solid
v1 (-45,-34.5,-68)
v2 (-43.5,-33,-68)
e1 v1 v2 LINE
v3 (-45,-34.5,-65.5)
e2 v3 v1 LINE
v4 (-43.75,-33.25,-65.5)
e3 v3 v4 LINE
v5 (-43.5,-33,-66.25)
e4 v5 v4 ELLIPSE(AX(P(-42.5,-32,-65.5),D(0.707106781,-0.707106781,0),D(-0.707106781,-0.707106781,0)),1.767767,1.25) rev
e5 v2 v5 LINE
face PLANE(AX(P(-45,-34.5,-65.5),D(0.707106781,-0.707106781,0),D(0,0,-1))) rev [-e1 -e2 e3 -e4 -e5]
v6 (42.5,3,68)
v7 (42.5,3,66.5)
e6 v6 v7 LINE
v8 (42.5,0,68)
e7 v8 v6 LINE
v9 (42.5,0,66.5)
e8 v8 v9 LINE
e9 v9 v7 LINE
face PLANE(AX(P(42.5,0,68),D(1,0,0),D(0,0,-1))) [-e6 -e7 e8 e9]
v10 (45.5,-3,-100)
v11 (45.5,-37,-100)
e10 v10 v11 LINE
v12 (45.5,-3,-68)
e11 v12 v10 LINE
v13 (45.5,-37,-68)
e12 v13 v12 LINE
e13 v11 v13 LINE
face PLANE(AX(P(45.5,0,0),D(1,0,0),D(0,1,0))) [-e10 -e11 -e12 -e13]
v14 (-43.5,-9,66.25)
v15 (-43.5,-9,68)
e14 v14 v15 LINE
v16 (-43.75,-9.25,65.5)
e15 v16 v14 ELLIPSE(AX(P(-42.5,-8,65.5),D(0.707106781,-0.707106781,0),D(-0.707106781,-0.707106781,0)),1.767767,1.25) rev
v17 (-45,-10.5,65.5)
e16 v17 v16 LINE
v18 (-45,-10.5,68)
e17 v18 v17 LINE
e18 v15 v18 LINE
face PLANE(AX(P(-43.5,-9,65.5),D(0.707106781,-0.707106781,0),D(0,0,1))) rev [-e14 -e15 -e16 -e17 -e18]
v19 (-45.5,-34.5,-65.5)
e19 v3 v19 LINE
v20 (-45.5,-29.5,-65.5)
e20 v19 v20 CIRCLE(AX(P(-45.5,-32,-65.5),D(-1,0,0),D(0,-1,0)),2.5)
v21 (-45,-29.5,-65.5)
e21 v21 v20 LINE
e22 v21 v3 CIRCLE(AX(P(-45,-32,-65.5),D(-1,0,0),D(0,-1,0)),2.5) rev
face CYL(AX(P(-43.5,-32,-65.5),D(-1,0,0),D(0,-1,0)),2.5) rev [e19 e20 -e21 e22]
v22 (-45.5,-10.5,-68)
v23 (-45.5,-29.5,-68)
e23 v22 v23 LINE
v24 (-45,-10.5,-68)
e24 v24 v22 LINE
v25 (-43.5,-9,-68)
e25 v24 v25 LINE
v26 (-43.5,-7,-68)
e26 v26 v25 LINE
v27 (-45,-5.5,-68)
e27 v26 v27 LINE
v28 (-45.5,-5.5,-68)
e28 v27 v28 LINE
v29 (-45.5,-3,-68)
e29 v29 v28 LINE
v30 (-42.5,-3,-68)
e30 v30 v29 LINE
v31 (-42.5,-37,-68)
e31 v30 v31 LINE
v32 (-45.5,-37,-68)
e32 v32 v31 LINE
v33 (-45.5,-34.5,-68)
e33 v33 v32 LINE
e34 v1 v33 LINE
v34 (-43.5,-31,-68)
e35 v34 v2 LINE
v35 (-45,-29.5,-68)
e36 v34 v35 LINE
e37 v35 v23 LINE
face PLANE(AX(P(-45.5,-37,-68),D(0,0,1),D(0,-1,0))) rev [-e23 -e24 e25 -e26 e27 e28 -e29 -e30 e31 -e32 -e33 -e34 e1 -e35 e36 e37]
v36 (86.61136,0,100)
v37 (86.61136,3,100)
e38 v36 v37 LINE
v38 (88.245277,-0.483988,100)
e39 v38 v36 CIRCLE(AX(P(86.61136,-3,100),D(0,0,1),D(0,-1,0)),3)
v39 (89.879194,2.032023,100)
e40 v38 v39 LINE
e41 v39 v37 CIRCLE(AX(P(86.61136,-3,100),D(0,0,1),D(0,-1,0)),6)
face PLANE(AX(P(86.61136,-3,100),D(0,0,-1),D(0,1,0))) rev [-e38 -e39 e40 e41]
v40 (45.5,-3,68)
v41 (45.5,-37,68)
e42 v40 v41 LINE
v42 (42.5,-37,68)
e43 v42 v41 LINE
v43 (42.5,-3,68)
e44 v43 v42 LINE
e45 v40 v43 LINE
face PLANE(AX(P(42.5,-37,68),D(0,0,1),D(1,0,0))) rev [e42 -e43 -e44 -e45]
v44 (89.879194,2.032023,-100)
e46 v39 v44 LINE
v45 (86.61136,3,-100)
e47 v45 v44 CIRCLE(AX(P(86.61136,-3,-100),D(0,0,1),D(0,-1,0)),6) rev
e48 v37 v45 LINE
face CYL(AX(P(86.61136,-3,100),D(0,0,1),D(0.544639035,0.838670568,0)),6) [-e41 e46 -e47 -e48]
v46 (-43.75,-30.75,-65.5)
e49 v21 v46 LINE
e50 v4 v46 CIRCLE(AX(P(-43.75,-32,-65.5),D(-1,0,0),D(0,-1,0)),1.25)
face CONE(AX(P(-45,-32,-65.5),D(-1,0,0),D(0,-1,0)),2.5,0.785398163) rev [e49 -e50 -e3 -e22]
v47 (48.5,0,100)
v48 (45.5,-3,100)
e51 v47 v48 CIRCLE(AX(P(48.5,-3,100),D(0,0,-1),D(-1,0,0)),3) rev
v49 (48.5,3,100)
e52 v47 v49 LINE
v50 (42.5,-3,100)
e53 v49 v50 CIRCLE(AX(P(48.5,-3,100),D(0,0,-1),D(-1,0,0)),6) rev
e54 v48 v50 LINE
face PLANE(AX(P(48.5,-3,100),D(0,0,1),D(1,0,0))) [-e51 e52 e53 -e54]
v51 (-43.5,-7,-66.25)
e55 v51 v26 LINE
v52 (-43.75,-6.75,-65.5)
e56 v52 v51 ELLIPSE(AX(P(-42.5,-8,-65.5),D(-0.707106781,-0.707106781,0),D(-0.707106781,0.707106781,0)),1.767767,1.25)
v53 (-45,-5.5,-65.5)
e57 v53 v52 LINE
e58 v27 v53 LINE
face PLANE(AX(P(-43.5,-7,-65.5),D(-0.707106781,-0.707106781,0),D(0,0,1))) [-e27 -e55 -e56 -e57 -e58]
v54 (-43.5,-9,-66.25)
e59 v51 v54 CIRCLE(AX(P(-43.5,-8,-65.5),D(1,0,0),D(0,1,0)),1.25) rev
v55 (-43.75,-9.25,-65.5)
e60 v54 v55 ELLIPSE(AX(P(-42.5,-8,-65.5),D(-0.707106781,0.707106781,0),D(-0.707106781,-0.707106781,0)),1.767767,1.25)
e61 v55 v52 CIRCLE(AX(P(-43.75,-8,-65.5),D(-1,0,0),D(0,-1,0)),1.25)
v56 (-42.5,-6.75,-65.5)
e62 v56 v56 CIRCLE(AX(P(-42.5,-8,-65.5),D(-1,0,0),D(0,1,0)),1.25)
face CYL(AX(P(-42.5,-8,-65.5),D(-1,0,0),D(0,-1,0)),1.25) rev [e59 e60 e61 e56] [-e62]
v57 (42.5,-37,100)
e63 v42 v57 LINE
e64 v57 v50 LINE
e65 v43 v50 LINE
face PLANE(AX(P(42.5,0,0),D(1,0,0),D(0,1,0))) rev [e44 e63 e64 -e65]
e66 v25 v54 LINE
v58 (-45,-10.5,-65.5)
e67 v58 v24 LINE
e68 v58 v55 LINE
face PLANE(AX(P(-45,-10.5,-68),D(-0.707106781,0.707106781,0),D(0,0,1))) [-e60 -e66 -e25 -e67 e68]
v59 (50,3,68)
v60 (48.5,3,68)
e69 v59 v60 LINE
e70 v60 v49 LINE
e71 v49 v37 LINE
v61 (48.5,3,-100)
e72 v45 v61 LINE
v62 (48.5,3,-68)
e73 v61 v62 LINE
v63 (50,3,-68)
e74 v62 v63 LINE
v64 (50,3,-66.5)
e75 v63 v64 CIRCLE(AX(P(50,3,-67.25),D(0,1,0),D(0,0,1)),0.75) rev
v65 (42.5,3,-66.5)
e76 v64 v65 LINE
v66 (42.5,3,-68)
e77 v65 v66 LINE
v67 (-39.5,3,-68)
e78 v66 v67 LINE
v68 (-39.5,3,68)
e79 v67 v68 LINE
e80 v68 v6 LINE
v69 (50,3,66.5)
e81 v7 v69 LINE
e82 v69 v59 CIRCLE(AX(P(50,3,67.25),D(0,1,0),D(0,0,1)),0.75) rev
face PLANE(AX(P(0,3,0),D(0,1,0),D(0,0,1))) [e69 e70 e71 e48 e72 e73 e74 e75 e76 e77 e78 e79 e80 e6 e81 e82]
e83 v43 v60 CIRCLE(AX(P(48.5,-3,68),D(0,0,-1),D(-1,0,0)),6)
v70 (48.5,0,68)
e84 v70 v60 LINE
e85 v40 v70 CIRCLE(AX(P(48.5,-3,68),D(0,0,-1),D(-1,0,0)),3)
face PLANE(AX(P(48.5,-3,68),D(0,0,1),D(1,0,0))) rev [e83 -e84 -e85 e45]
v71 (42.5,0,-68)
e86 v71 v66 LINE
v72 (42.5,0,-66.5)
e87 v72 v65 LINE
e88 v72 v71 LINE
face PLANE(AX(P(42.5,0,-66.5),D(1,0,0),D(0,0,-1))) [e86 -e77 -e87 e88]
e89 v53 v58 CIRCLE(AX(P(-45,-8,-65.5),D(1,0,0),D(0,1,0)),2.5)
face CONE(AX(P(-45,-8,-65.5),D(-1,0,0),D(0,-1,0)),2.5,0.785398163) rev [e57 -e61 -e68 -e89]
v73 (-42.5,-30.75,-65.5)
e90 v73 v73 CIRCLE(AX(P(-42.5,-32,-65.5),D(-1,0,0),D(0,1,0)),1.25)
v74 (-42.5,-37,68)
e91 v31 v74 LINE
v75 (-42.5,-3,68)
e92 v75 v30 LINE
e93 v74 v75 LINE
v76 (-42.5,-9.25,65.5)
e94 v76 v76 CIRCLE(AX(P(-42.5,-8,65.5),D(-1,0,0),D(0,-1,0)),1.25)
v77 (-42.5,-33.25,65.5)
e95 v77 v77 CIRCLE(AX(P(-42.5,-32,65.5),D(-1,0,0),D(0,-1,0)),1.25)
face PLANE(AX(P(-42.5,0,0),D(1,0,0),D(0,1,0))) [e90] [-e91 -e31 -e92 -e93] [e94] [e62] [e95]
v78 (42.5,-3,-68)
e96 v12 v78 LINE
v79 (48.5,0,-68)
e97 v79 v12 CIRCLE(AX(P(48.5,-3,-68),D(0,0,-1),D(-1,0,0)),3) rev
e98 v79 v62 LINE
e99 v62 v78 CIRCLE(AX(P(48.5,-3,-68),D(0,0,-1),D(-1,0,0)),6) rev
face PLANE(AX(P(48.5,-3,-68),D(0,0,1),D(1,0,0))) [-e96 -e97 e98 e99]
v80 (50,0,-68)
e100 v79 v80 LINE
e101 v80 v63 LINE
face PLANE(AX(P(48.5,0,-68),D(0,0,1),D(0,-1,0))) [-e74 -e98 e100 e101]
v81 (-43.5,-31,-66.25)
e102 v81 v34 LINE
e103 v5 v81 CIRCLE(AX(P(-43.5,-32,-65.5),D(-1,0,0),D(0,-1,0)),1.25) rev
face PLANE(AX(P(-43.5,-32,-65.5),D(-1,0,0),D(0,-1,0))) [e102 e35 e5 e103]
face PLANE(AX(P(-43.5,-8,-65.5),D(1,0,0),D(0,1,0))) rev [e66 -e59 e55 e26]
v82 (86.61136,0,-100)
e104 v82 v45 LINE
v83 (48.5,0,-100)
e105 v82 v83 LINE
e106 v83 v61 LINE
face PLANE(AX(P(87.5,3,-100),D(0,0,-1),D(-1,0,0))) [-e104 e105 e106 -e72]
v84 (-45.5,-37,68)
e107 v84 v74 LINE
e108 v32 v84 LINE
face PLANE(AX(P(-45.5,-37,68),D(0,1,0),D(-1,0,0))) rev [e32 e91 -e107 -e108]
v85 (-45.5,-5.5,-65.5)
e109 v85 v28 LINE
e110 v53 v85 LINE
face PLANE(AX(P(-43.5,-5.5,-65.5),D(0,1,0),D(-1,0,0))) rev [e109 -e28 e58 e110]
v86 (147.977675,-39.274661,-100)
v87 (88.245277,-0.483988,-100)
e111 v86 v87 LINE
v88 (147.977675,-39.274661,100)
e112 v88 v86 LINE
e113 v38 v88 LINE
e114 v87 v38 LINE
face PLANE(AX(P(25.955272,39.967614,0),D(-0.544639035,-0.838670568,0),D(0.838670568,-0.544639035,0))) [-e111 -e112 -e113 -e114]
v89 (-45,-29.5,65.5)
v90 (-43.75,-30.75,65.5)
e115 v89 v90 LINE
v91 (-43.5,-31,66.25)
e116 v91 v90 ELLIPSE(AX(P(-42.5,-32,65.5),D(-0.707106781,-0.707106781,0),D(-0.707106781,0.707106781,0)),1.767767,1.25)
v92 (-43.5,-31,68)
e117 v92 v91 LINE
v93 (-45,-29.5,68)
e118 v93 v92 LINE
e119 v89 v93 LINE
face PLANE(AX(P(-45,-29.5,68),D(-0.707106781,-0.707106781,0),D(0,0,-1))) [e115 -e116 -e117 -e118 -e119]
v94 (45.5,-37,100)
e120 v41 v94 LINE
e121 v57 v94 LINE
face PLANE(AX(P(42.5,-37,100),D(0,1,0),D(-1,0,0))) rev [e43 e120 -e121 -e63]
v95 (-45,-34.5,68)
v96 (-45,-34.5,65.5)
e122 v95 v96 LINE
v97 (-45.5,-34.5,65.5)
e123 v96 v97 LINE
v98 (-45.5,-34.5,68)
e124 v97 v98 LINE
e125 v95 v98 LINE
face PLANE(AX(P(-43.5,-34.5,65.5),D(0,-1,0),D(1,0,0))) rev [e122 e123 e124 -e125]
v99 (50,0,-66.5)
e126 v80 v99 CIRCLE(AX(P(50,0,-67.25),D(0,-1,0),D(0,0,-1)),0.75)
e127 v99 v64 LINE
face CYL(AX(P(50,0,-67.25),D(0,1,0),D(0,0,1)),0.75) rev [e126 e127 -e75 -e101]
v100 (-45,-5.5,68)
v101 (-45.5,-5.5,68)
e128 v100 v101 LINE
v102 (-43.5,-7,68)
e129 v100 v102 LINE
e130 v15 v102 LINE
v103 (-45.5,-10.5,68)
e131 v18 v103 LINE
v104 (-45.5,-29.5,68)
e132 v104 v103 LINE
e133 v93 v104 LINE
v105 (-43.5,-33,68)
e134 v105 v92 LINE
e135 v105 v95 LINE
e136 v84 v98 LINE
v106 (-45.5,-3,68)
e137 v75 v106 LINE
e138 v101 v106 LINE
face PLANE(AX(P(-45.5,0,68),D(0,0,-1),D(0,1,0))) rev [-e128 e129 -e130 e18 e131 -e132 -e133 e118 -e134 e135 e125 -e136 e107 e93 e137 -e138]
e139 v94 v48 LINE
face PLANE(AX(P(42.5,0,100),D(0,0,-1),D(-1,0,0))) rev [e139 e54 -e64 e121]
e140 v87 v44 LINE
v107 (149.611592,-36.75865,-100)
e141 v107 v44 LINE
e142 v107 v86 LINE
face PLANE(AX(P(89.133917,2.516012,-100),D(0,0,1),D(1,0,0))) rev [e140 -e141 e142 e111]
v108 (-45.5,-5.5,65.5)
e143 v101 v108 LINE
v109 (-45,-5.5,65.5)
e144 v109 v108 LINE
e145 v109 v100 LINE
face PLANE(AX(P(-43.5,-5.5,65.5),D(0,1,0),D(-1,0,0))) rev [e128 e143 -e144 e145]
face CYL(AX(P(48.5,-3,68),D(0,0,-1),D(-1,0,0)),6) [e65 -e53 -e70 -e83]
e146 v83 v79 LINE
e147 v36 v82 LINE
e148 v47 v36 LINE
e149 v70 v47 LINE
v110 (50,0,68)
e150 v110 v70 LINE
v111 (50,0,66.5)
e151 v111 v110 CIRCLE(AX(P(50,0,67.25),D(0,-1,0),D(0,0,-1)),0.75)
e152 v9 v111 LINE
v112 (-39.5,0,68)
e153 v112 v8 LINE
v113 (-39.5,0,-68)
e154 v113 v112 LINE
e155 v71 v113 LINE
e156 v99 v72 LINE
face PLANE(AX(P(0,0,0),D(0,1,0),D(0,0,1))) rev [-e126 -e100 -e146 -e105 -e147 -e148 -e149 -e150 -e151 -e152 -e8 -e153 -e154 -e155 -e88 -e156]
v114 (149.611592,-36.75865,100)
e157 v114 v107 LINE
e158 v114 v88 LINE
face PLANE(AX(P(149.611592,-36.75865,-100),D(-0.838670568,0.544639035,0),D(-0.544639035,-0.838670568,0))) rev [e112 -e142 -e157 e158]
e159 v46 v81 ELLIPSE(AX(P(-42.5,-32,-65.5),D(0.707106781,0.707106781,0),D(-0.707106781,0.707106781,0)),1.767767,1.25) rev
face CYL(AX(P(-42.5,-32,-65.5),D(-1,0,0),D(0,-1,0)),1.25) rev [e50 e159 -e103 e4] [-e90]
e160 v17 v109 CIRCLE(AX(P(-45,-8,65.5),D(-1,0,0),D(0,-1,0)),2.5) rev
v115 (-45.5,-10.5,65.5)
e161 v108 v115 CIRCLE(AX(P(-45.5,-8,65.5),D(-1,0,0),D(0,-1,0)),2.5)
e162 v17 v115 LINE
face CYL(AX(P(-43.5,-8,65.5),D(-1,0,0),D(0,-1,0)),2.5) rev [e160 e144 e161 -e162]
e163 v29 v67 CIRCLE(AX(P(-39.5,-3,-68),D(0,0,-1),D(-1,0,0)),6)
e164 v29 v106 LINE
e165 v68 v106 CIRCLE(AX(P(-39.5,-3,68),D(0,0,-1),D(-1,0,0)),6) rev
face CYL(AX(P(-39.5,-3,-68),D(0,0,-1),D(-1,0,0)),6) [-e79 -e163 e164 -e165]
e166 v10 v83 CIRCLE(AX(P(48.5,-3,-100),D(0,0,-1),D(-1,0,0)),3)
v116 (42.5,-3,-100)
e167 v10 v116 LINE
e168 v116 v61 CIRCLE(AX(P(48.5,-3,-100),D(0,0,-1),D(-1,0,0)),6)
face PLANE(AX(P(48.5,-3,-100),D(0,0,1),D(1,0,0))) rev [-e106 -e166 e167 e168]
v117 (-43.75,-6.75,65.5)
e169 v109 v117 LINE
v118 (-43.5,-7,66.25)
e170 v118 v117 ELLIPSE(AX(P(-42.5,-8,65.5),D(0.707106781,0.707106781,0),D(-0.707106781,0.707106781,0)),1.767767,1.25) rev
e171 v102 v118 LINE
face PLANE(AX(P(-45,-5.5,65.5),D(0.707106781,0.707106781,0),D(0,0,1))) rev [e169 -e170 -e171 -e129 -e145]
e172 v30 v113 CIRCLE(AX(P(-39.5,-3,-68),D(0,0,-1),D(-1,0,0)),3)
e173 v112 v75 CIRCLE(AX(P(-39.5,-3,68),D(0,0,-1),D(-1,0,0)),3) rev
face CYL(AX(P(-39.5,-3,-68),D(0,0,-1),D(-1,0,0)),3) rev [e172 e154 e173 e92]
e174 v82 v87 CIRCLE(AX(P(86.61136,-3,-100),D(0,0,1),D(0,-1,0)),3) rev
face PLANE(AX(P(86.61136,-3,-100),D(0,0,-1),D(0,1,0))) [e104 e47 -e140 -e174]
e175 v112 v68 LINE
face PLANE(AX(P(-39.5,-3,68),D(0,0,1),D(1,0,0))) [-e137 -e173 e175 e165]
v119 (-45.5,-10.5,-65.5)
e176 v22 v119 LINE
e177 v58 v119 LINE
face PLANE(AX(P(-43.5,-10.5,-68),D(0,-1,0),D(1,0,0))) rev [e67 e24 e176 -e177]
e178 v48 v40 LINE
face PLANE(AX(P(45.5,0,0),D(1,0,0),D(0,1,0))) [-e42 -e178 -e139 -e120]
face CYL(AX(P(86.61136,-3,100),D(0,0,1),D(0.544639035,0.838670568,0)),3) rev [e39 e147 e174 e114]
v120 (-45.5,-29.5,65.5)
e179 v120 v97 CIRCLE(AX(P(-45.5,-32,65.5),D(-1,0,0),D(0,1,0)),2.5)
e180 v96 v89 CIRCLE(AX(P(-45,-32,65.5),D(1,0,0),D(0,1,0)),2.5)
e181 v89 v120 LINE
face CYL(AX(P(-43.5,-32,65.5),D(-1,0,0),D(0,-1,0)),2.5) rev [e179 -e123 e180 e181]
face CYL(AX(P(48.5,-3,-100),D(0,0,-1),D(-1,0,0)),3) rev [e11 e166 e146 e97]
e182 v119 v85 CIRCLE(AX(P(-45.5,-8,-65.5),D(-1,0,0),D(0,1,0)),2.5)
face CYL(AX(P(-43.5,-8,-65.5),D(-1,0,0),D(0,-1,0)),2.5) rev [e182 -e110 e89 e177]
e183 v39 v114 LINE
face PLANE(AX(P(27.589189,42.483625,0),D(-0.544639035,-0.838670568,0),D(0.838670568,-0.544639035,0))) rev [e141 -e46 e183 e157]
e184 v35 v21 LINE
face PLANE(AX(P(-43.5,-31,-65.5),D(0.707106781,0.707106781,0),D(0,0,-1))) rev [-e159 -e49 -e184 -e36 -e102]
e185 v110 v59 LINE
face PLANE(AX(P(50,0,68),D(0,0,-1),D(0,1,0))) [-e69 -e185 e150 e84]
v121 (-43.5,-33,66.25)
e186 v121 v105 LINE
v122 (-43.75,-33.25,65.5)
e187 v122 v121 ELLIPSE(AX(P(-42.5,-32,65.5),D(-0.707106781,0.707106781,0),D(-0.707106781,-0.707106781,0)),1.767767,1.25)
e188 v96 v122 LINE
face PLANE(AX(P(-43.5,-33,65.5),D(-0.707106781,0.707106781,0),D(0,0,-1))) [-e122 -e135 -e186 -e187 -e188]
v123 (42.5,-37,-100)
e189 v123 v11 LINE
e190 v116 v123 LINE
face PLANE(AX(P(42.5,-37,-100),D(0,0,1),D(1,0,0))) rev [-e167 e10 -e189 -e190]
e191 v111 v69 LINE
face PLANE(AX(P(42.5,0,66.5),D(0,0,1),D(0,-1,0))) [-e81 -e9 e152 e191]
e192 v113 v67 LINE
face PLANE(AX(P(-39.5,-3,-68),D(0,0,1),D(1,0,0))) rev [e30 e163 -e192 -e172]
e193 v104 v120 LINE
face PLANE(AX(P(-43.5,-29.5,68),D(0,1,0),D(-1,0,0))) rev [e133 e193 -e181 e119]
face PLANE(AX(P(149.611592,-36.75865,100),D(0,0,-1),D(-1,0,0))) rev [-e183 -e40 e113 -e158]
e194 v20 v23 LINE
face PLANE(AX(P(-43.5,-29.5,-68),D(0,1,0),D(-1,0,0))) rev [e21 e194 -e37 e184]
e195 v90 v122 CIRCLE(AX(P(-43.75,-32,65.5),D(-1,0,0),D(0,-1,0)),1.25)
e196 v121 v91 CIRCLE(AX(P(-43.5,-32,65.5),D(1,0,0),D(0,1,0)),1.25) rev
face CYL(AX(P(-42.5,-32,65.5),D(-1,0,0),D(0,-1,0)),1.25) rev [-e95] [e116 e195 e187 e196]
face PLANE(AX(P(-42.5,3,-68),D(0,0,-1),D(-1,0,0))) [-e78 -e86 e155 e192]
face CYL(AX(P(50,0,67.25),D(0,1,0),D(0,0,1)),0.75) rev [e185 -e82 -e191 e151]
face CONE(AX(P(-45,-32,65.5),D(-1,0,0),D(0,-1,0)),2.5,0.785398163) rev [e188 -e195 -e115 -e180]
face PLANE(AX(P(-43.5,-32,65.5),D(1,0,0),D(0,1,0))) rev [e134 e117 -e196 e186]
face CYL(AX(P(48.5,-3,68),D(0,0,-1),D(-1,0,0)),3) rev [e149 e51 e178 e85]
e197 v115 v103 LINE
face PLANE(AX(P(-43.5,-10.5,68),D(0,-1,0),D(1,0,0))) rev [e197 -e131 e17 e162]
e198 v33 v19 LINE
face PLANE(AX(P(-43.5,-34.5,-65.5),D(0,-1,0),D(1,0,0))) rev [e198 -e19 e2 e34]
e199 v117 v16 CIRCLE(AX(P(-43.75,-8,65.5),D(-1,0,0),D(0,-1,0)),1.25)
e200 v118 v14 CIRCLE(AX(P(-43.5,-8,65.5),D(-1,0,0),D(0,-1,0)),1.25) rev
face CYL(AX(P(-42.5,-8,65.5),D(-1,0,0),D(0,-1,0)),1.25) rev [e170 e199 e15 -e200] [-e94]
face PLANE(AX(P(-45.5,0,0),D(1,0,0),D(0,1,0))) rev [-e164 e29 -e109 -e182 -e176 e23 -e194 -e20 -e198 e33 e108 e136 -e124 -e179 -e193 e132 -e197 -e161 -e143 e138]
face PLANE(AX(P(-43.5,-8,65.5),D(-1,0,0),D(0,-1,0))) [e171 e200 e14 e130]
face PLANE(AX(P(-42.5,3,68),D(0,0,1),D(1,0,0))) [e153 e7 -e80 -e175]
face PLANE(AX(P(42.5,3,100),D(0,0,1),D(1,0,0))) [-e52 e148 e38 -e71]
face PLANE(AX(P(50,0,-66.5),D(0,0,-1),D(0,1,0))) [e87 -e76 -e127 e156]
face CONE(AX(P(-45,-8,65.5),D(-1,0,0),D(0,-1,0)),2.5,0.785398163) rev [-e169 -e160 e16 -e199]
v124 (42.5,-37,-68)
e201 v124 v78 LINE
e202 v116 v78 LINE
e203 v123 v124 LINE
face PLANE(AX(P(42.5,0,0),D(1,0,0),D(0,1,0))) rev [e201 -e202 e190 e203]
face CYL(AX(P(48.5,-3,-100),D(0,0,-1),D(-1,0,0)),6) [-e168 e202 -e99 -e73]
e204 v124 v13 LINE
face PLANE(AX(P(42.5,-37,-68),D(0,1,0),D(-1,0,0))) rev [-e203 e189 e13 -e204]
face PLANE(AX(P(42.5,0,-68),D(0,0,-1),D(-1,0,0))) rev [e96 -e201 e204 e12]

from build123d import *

# Parameters (mm, degrees)
SALIENTE_EXTRUIR1_DEPTH          = 3
BRIDA_DE_ARISTA1_STRIP_W         = 18
BRIDA_DE_ARISTA1_STRIP_H         = 3
BRIDA_DE_ARISTA1_STRIP_CUT_DEPTH = 136
BRIDA_DE_ARISTA1_DEPTH           = 136
CROQUIS5_R                       = 1.25
CORTAR_EXTRUIR1_DEPTH            = 3
CORTAR_EXTRUIR2_DEPTH            = 2
CHAFL_N1_SIZE                    = 1.5
BRIDA_START                      = -100
BRIDA_DE_ARISTA2_DEPTH           = 33.5
BRIDA_START_2                    = 66.5
BRIDA_DE_ARISTA2_2_DEPTH         = 33.5
BRIDA_DE_ARISTA2_3_DEPTH         = 32
BRIDA_START_3                    = 68
BRIDA_DE_ARISTA2_4_DEPTH         = 32
BRIDA_START_4                    = -3
BRIDA_DE_ARISTA2_5_DEPTH         = 7
BRIDA_DE_ARISTA3_STRIP_CUT_DEPTH = 200
BRIDA_DE_ARISTA3_DEPTH           = 200


with BuildPart() as part:
    # Croquis1 → Saliente-Extruir1 (new body)
    with BuildSketch(Plane(origin=(0, 0, 0), x_dir=(1, 0, 0), z_dir=(0, 1, 0))):
        Polygon((-42.5, -68), (42.5, -68), (42.5, -100), (87.5, -100), (87.5, 100), (42.5, 100), (42.5, 68), (-42.5, 68), align=None)
    extrude(amount=SALIENTE_EXTRUIR1_DEPTH)

    # Brida de arista1: sheet metal written as solids
    # Brida de arista1 strip (on a plane across the edge) → Brida de arista1 strip cut (cut)
    with BuildSketch(Plane(origin=(-42.5, 0, 68), x_dir=(1, 0, 0), z_dir=(0, 0, -1))):
        with Locations((-6, -1.5)):
            Rectangle(BRIDA_DE_ARISTA1_STRIP_W, BRIDA_DE_ARISTA1_STRIP_H)
    extrude(amount=BRIDA_DE_ARISTA1_STRIP_CUT_DEPTH, mode=Mode.SUBTRACT)

    # Brida de arista1 section (on a plane across the edge) → Brida de arista1 (add)
    with BuildSketch(Plane(origin=(-42.5, 0, 68), x_dir=(1, 0, 0), z_dir=(0, 0, -1))):
        with BuildLine():
            Line((-3, 3), (-3, 37))
            Line((-3, 37), (0, 37))
            Line((0, 37), (0, 3))
            ThreePointArc((0, 3), (0.878679656, 0.878679656), (3, 0))
            Line((3, 0), (3, -3))
            ThreePointArc((3, -3), (-1.242640687, -1.242640687), (-3, 3))
        make_face()
    extrude(amount=BRIDA_DE_ARISTA1_DEPTH)

    # Croquis5 → Cortar-Extruir1 (cut)
    with BuildSketch(Plane.ZY.offset(45.5)):
        with Locations(Location((65.5, -32, 0), (0, 0, 270))):
            Circle(CROQUIS5_R)
        with Locations(Location((65.5, -8, 0), (0, 0, 270))):
            Circle(CROQUIS5_R)
        with Locations(Location((-65.5, -8, 0), (0, 0, 90))):
            Circle(CROQUIS5_R)
        with Locations(Location((-65.5, -32, 0), (0, 0, 90))):
            Circle(CROQUIS5_R)
    extrude(amount=-CORTAR_EXTRUIR1_DEPTH, mode=Mode.SUBTRACT)

    # Croquis6 → Cortar-Extruir2 (cut)
    with BuildSketch(Plane.ZY.offset(45.5)):
        with BuildLine():
            Line((65.5, -5.5), (68, -5.5))
            Line((68, -5.5), (68, -10.5))
            Line((68, -10.5), (65.5, -10.5))
            ThreePointArc((65.5, -10.5), (63, -8), (65.5, -5.5))
        make_face()
        with BuildLine():
            Line((68, -29.5), (65.5, -29.5))
            ThreePointArc((65.5, -29.5), (63, -32), (65.5, -34.5))
            Line((65.5, -34.5), (68, -34.5))
            Line((68, -34.5), (68, -29.5))
        make_face()
        with BuildLine():
            Line((-65.5, -34.5), (-68, -34.5))
            Line((-68, -34.5), (-68, -29.5))
            Line((-68, -29.5), (-65.5, -29.5))
            ThreePointArc((-65.5, -29.5), (-63, -32), (-65.5, -34.5))
        make_face()
        with BuildLine():
            Line((-68, -10.5), (-65.5, -10.5))
            ThreePointArc((-65.5, -10.5), (-63, -8), (-65.5, -5.5))
            Line((-65.5, -5.5), (-68, -5.5))
            Line((-68, -5.5), (-68, -10.5))
        make_face()
    extrude(amount=-CORTAR_EXTRUIR2_DEPTH, mode=Mode.SUBTRACT)

    # Chaflán1
    # the kernel refuses this chamfer: 1.5 mm, written as the material it adds along each edge
    with BuildSketch(Plane(origin=(-43.5, -5.5, 65.5), x_dir=(-1, 0, 0), z_dir=(0, 0, 1))) as chafl_n1_piece_1_section:
        Polygon((CHAFL_N1_SIZE, 0), (0, CHAFL_N1_SIZE), (0, 0), align=None)
    chafl_n1_piece_1 = extrude(amount=2.5, mode=Mode.PRIVATE)
    chafl_n1_piece_1 = chafl_n1_piece_1 - Plane(origin=(-43.5, -8, 65.5), x_dir=(0, -1, 0), z_dir=(-1, 0, 0)) * Cylinder(1.25, 12, mode=Mode.PRIVATE)
    add(chafl_n1_piece_1)
    with BuildSketch(Plane(origin=(-43.5, -10.5, 68), x_dir=(0, 1, 0), z_dir=(0, 0, -1))) as chafl_n1_piece_2_section:
        Polygon((CHAFL_N1_SIZE, 0), (0, -CHAFL_N1_SIZE), (0, 0), align=None)
    chafl_n1_piece_2 = extrude(amount=2.5, mode=Mode.PRIVATE)
    chafl_n1_piece_2 = chafl_n1_piece_2 - Plane(origin=(-43.5, -8, 65.5), x_dir=(0, -1, 0), z_dir=(-1, 0, 0)) * Cylinder(1.25, 12, mode=Mode.PRIVATE)
    add(chafl_n1_piece_2)
    with BuildSketch(Plane(origin=(-43.5, -29.5, 68), x_dir=(-1, 0, 0), z_dir=(0, 0, -1))) as chafl_n1_piece_3_section:
        Polygon((CHAFL_N1_SIZE, 0), (0, -CHAFL_N1_SIZE), (0, 0), align=None)
    chafl_n1_piece_3 = extrude(amount=2.5, mode=Mode.PRIVATE)
    chafl_n1_piece_3 = chafl_n1_piece_3 - Plane(origin=(-43.5, -32, 65.5), x_dir=(0, -1, 0), z_dir=(-1, 0, 0)) * Cylinder(1.25, 12, mode=Mode.PRIVATE)
    add(chafl_n1_piece_3)
    with BuildSketch(Plane(origin=(-43.5, -34.5, 65.5), x_dir=(0, 1, 0), z_dir=(0, 0, 1))) as chafl_n1_piece_4_section:
        Polygon((CHAFL_N1_SIZE, 0), (0, CHAFL_N1_SIZE), (0, 0), align=None)
    chafl_n1_piece_4 = extrude(amount=2.5, mode=Mode.PRIVATE)
    chafl_n1_piece_4 = chafl_n1_piece_4 - Plane(origin=(-43.5, -32, 65.5), x_dir=(0, -1, 0), z_dir=(-1, 0, 0)) * Cylinder(1.25, 12, mode=Mode.PRIVATE)
    add(chafl_n1_piece_4)
    with BuildSketch(Plane(origin=(-43.5, -34.5, -65.5), x_dir=(-1, 0, 0), z_dir=(0, 0, -1))) as chafl_n1_piece_5_section:
        Polygon((CHAFL_N1_SIZE, 0), (0, CHAFL_N1_SIZE), (0, 0), align=None)
    chafl_n1_piece_5 = extrude(amount=2.5, mode=Mode.PRIVATE)
    chafl_n1_piece_5 = chafl_n1_piece_5 - Plane(origin=(-43.5, -32, -65.5), x_dir=(0, 1, 0), z_dir=(-1, 0, 0)) * Cylinder(1.25, 12, mode=Mode.PRIVATE)
    add(chafl_n1_piece_5)
    with BuildSketch(Plane(origin=(-43.5, -29.5, -68), x_dir=(-1, 0, 0), z_dir=(0, 0, 1))) as chafl_n1_piece_6_section:
        Polygon((CHAFL_N1_SIZE, 0), (0, CHAFL_N1_SIZE), (0, 0), align=None)
    chafl_n1_piece_6 = extrude(amount=2.5, mode=Mode.PRIVATE)
    chafl_n1_piece_6 = chafl_n1_piece_6 - Plane(origin=(-43.5, -32, -65.5), x_dir=(0, 1, 0), z_dir=(-1, 0, 0)) * Cylinder(1.25, 12, mode=Mode.PRIVATE)
    add(chafl_n1_piece_6)
    with BuildSketch(Plane(origin=(-43.5, -10.5, -68), x_dir=(-1, 0, 0), z_dir=(0, 0, 1))) as chafl_n1_piece_7_section:
        Polygon((CHAFL_N1_SIZE, 0), (0, -CHAFL_N1_SIZE), (0, 0), align=None)
    chafl_n1_piece_7 = extrude(amount=2.5, mode=Mode.PRIVATE)
    chafl_n1_piece_7 = chafl_n1_piece_7 - Plane(origin=(-43.5, -8, -65.5), x_dir=(0, 1, 0), z_dir=(-1, 0, 0)) * Cylinder(1.25, 12, mode=Mode.PRIVATE)
    add(chafl_n1_piece_7)
    with BuildSketch(Plane(origin=(-43.5, -5.5, -65.5), x_dir=(-1, 0, 0), z_dir=(0, 0, -1))) as chafl_n1_piece_8_section:
        Polygon((CHAFL_N1_SIZE, 0), (0, -CHAFL_N1_SIZE), (0, 0), align=None)
    chafl_n1_piece_8 = extrude(amount=2.5, mode=Mode.PRIVATE)
    chafl_n1_piece_8 = chafl_n1_piece_8 - Plane(origin=(-43.5, -8, -65.5), x_dir=(0, 1, 0), z_dir=(-1, 0, 0)) * Cylinder(1.25, 12, mode=Mode.PRIVATE)
    add(chafl_n1_piece_8)
    with BuildSketch(Plane(origin=(-43.5, -8, -65.5), x_dir=(0, -1, 0), z_dir=(0, 0, -1))) as chafl_n1_piece_9_section:
        Polygon((2.5, CHAFL_N1_SIZE), (2.5 - CHAFL_N1_SIZE, 0), (2.5, 0), align=None)
    chafl_n1_piece_9 = revolve(axis=Axis((-43.5, -8, -65.5), (-1, 0, 0)), revolution_arc=180, mode=Mode.PRIVATE)
    chafl_n1_piece_9 = chafl_n1_piece_9 - Plane(origin=(-43.5, -8, -65.5), x_dir=(0, 1, 0), z_dir=(-1, 0, 0)) * Cylinder(1.25, 11, mode=Mode.PRIVATE)
    add(chafl_n1_piece_9)
    with BuildSketch(Plane(origin=(-43.5, -32, -65.5), x_dir=(0, 1, 0), z_dir=(0, 0, -1))) as chafl_n1_piece_10_section:
        Polygon((2.5, -CHAFL_N1_SIZE), (2.5 - CHAFL_N1_SIZE, 0), (2.5, 0), align=None)
    chafl_n1_piece_10 = revolve(axis=Axis((-43.5, -32, -65.5), (1, 0, 0)), revolution_arc=180, mode=Mode.PRIVATE)
    chafl_n1_piece_10 = chafl_n1_piece_10 - Plane(origin=(-43.5, -32, -65.5), x_dir=(0, 1, 0), z_dir=(-1, 0, 0)) * Cylinder(1.25, 11, mode=Mode.PRIVATE)
    add(chafl_n1_piece_10)
    with BuildSketch(Plane(origin=(-43.5, -32, 65.5), x_dir=(0, 1, 0), z_dir=(0, 0, 1))) as chafl_n1_piece_11_section:
        Polygon((2.5 - CHAFL_N1_SIZE, 0), (2.5, CHAFL_N1_SIZE), (2.5, 0), align=None)
    chafl_n1_piece_11 = revolve(axis=Axis((-43.5, -32, 65.5), (-1, 0, 0)), revolution_arc=180, mode=Mode.PRIVATE)
    chafl_n1_piece_11 = chafl_n1_piece_11 - Plane(origin=(-43.5, -32, 65.5), x_dir=(0, -1, 0), z_dir=(-1, 0, 0)) * Cylinder(1.25, 11, mode=Mode.PRIVATE)
    add(chafl_n1_piece_11)
    with BuildSketch(Plane(origin=(-43.5, -8, 65.5), x_dir=(0, -1, 0), z_dir=(0, 0, 1))) as chafl_n1_piece_12_section:
        Polygon((2.5 - CHAFL_N1_SIZE, 0), (2.5, -CHAFL_N1_SIZE), (2.5, 0), align=None)
    chafl_n1_piece_12 = revolve(axis=Axis((-43.5, -8, 65.5), (1, 0, 0)), revolution_arc=180, mode=Mode.PRIVATE)
    chafl_n1_piece_12 = chafl_n1_piece_12 - Plane(origin=(-43.5, -8, 65.5), x_dir=(0, -1, 0), z_dir=(-1, 0, 0)) * Cylinder(1.25, 11, mode=Mode.PRIVATE)
    add(chafl_n1_piece_12)

    # Brida de arista2: read off the stored shape, not the designer's step
    # Brida de arista2 outline → Brida de arista2 (cut)
    with BuildSketch(Plane.XY.offset(BRIDA_START)):
        with BuildLine():
            Line((42.5, 0), (43.303847577, 0))
            ThreePointArc((43.303847577, 0), (45.5, 2.196152423), (48.5, 3))
            Line((48.5, 3), (42.5, 3))
            Line((42.5, 3), (42.5, 0))
        make_face()
    extrude(amount=BRIDA_DE_ARISTA2_DEPTH, mode=Mode.SUBTRACT)

    # Brida de arista2 2 outline → Brida de arista2 2 (cut)
    with BuildSketch(Plane.XY.offset(BRIDA_START_2)):
        with BuildLine():
            Line((42.5, 0), (43.303847577, 0))
            ThreePointArc((43.303847577, 0), (45.5, 2.196152423), (48.5, 3))
            Line((48.5, 3), (42.5, 3))
            Line((42.5, 3), (42.5, 0))
        make_face()
    extrude(amount=BRIDA_DE_ARISTA2_2_DEPTH, mode=Mode.SUBTRACT)

    # Brida de arista2 3 outline → Brida de arista2 3 (add)
    with BuildSketch(Plane.XY.offset(BRIDA_START)):
        with BuildLine():
            Line((42.5, -37), (45.5, -37))
            Line((45.5, -37), (45.5, -3))
            ThreePointArc((45.5, -3), (46.378679656, -0.878679656), (48.5, 0))
            Line((48.5, 0), (43.303847577, 0))
            ThreePointArc((43.303847577, 0), (42.704445042, -1.447085729), (42.5, -3))
            Line((42.5, -3), (42.5, -37))
        make_face()
    extrude(amount=BRIDA_DE_ARISTA2_3_DEPTH)

    # Brida de arista2 4 outline → Brida de arista2 4 (add)
    with BuildSketch(Plane.XY.offset(BRIDA_START_3)):
        with BuildLine():
            Line((42.5, -37), (45.5, -37))
            Line((45.5, -37), (45.5, -3))
            ThreePointArc((45.5, -3), (46.378679656, -0.878679656), (48.5, 0))
            Line((48.5, 0), (43.303847577, 0))
            ThreePointArc((43.303847577, 0), (42.704445042, -1.447085729), (42.5, -3))
            Line((42.5, -3), (42.5, -37))
        make_face()
    extrude(amount=BRIDA_DE_ARISTA2_4_DEPTH)

    # Brida de arista2 5 outline → Brida de arista2 5 (cut)
    with BuildSketch(Plane(origin=(0, 0, 0), x_dir=(1, 0, 0), z_dir=(0, 1, 0)).offset(BRIDA_START_4)):
        with BuildLine():
            Line((50, -66.5), (43, -66.5))
            Line((43, -66.5), (43, -68))
            Line((43, -68), (50, -68))
            ThreePointArc((50, -68), (50.75, -67.25), (50, -66.5))
        make_face()
        with BuildLine():
            Line((43, 68), (43, 66.5))
            Line((43, 66.5), (50, 66.5))
            ThreePointArc((50, 66.5), (50.75, 67.25), (50, 68))
            Line((50, 68), (43, 68))
        make_face()
    extrude(amount=BRIDA_DE_ARISTA2_5_DEPTH, mode=Mode.SUBTRACT)

    # Brida de arista3: sheet metal written as solids
    # Brida de arista3 strip (on a plane across the edge) → Brida de arista3 strip cut (cut)
    with BuildSketch(Plane(origin=(87.5, 0, -100), x_dir=(-0.5446390350150233, -0.8386705679454266, 0), z_dir=(0, 0, 1))):
        Polygon((-11.835526038, 12.716876498), (-2.032023408, -2.379193725), (0.483988296, -0.74527662), (-9.319514334, 14.350793603), align=None)
    extrude(amount=BRIDA_DE_ARISTA3_STRIP_CUT_DEPTH, mode=Mode.SUBTRACT)

    # Brida de arista3 section (on a plane across the edge) → Brida de arista3 (add)
    with BuildSketch(Plane(origin=(87.5, 0, -100), x_dir=(-0.5446390350150233, -0.8386705679454266, 0), z_dir=(0, 0, 1))):
        with BuildLine():
            Line((-3, 0.888640485), (-3, 72.111359515))
            Line((-3, 72.111359515), (0, 72.111359515))
            Line((0, 72.111359515), (0, 0.888640485))
            ThreePointArc((0, 0.888640485), (0.123540795, 0.036594451), (0.483988296, -0.74527662))
            Line((0.483988296, -0.74527662), (-2.032023408, -2.379193725))
            ThreePointArc((-2.032023408, -2.379193725), (-2.752918409, -0.815451583), (-3, 0.888640485))
        make_face()
    extrude(amount=BRIDA_DE_ARISTA3_DEPTH)


solid = part.part
